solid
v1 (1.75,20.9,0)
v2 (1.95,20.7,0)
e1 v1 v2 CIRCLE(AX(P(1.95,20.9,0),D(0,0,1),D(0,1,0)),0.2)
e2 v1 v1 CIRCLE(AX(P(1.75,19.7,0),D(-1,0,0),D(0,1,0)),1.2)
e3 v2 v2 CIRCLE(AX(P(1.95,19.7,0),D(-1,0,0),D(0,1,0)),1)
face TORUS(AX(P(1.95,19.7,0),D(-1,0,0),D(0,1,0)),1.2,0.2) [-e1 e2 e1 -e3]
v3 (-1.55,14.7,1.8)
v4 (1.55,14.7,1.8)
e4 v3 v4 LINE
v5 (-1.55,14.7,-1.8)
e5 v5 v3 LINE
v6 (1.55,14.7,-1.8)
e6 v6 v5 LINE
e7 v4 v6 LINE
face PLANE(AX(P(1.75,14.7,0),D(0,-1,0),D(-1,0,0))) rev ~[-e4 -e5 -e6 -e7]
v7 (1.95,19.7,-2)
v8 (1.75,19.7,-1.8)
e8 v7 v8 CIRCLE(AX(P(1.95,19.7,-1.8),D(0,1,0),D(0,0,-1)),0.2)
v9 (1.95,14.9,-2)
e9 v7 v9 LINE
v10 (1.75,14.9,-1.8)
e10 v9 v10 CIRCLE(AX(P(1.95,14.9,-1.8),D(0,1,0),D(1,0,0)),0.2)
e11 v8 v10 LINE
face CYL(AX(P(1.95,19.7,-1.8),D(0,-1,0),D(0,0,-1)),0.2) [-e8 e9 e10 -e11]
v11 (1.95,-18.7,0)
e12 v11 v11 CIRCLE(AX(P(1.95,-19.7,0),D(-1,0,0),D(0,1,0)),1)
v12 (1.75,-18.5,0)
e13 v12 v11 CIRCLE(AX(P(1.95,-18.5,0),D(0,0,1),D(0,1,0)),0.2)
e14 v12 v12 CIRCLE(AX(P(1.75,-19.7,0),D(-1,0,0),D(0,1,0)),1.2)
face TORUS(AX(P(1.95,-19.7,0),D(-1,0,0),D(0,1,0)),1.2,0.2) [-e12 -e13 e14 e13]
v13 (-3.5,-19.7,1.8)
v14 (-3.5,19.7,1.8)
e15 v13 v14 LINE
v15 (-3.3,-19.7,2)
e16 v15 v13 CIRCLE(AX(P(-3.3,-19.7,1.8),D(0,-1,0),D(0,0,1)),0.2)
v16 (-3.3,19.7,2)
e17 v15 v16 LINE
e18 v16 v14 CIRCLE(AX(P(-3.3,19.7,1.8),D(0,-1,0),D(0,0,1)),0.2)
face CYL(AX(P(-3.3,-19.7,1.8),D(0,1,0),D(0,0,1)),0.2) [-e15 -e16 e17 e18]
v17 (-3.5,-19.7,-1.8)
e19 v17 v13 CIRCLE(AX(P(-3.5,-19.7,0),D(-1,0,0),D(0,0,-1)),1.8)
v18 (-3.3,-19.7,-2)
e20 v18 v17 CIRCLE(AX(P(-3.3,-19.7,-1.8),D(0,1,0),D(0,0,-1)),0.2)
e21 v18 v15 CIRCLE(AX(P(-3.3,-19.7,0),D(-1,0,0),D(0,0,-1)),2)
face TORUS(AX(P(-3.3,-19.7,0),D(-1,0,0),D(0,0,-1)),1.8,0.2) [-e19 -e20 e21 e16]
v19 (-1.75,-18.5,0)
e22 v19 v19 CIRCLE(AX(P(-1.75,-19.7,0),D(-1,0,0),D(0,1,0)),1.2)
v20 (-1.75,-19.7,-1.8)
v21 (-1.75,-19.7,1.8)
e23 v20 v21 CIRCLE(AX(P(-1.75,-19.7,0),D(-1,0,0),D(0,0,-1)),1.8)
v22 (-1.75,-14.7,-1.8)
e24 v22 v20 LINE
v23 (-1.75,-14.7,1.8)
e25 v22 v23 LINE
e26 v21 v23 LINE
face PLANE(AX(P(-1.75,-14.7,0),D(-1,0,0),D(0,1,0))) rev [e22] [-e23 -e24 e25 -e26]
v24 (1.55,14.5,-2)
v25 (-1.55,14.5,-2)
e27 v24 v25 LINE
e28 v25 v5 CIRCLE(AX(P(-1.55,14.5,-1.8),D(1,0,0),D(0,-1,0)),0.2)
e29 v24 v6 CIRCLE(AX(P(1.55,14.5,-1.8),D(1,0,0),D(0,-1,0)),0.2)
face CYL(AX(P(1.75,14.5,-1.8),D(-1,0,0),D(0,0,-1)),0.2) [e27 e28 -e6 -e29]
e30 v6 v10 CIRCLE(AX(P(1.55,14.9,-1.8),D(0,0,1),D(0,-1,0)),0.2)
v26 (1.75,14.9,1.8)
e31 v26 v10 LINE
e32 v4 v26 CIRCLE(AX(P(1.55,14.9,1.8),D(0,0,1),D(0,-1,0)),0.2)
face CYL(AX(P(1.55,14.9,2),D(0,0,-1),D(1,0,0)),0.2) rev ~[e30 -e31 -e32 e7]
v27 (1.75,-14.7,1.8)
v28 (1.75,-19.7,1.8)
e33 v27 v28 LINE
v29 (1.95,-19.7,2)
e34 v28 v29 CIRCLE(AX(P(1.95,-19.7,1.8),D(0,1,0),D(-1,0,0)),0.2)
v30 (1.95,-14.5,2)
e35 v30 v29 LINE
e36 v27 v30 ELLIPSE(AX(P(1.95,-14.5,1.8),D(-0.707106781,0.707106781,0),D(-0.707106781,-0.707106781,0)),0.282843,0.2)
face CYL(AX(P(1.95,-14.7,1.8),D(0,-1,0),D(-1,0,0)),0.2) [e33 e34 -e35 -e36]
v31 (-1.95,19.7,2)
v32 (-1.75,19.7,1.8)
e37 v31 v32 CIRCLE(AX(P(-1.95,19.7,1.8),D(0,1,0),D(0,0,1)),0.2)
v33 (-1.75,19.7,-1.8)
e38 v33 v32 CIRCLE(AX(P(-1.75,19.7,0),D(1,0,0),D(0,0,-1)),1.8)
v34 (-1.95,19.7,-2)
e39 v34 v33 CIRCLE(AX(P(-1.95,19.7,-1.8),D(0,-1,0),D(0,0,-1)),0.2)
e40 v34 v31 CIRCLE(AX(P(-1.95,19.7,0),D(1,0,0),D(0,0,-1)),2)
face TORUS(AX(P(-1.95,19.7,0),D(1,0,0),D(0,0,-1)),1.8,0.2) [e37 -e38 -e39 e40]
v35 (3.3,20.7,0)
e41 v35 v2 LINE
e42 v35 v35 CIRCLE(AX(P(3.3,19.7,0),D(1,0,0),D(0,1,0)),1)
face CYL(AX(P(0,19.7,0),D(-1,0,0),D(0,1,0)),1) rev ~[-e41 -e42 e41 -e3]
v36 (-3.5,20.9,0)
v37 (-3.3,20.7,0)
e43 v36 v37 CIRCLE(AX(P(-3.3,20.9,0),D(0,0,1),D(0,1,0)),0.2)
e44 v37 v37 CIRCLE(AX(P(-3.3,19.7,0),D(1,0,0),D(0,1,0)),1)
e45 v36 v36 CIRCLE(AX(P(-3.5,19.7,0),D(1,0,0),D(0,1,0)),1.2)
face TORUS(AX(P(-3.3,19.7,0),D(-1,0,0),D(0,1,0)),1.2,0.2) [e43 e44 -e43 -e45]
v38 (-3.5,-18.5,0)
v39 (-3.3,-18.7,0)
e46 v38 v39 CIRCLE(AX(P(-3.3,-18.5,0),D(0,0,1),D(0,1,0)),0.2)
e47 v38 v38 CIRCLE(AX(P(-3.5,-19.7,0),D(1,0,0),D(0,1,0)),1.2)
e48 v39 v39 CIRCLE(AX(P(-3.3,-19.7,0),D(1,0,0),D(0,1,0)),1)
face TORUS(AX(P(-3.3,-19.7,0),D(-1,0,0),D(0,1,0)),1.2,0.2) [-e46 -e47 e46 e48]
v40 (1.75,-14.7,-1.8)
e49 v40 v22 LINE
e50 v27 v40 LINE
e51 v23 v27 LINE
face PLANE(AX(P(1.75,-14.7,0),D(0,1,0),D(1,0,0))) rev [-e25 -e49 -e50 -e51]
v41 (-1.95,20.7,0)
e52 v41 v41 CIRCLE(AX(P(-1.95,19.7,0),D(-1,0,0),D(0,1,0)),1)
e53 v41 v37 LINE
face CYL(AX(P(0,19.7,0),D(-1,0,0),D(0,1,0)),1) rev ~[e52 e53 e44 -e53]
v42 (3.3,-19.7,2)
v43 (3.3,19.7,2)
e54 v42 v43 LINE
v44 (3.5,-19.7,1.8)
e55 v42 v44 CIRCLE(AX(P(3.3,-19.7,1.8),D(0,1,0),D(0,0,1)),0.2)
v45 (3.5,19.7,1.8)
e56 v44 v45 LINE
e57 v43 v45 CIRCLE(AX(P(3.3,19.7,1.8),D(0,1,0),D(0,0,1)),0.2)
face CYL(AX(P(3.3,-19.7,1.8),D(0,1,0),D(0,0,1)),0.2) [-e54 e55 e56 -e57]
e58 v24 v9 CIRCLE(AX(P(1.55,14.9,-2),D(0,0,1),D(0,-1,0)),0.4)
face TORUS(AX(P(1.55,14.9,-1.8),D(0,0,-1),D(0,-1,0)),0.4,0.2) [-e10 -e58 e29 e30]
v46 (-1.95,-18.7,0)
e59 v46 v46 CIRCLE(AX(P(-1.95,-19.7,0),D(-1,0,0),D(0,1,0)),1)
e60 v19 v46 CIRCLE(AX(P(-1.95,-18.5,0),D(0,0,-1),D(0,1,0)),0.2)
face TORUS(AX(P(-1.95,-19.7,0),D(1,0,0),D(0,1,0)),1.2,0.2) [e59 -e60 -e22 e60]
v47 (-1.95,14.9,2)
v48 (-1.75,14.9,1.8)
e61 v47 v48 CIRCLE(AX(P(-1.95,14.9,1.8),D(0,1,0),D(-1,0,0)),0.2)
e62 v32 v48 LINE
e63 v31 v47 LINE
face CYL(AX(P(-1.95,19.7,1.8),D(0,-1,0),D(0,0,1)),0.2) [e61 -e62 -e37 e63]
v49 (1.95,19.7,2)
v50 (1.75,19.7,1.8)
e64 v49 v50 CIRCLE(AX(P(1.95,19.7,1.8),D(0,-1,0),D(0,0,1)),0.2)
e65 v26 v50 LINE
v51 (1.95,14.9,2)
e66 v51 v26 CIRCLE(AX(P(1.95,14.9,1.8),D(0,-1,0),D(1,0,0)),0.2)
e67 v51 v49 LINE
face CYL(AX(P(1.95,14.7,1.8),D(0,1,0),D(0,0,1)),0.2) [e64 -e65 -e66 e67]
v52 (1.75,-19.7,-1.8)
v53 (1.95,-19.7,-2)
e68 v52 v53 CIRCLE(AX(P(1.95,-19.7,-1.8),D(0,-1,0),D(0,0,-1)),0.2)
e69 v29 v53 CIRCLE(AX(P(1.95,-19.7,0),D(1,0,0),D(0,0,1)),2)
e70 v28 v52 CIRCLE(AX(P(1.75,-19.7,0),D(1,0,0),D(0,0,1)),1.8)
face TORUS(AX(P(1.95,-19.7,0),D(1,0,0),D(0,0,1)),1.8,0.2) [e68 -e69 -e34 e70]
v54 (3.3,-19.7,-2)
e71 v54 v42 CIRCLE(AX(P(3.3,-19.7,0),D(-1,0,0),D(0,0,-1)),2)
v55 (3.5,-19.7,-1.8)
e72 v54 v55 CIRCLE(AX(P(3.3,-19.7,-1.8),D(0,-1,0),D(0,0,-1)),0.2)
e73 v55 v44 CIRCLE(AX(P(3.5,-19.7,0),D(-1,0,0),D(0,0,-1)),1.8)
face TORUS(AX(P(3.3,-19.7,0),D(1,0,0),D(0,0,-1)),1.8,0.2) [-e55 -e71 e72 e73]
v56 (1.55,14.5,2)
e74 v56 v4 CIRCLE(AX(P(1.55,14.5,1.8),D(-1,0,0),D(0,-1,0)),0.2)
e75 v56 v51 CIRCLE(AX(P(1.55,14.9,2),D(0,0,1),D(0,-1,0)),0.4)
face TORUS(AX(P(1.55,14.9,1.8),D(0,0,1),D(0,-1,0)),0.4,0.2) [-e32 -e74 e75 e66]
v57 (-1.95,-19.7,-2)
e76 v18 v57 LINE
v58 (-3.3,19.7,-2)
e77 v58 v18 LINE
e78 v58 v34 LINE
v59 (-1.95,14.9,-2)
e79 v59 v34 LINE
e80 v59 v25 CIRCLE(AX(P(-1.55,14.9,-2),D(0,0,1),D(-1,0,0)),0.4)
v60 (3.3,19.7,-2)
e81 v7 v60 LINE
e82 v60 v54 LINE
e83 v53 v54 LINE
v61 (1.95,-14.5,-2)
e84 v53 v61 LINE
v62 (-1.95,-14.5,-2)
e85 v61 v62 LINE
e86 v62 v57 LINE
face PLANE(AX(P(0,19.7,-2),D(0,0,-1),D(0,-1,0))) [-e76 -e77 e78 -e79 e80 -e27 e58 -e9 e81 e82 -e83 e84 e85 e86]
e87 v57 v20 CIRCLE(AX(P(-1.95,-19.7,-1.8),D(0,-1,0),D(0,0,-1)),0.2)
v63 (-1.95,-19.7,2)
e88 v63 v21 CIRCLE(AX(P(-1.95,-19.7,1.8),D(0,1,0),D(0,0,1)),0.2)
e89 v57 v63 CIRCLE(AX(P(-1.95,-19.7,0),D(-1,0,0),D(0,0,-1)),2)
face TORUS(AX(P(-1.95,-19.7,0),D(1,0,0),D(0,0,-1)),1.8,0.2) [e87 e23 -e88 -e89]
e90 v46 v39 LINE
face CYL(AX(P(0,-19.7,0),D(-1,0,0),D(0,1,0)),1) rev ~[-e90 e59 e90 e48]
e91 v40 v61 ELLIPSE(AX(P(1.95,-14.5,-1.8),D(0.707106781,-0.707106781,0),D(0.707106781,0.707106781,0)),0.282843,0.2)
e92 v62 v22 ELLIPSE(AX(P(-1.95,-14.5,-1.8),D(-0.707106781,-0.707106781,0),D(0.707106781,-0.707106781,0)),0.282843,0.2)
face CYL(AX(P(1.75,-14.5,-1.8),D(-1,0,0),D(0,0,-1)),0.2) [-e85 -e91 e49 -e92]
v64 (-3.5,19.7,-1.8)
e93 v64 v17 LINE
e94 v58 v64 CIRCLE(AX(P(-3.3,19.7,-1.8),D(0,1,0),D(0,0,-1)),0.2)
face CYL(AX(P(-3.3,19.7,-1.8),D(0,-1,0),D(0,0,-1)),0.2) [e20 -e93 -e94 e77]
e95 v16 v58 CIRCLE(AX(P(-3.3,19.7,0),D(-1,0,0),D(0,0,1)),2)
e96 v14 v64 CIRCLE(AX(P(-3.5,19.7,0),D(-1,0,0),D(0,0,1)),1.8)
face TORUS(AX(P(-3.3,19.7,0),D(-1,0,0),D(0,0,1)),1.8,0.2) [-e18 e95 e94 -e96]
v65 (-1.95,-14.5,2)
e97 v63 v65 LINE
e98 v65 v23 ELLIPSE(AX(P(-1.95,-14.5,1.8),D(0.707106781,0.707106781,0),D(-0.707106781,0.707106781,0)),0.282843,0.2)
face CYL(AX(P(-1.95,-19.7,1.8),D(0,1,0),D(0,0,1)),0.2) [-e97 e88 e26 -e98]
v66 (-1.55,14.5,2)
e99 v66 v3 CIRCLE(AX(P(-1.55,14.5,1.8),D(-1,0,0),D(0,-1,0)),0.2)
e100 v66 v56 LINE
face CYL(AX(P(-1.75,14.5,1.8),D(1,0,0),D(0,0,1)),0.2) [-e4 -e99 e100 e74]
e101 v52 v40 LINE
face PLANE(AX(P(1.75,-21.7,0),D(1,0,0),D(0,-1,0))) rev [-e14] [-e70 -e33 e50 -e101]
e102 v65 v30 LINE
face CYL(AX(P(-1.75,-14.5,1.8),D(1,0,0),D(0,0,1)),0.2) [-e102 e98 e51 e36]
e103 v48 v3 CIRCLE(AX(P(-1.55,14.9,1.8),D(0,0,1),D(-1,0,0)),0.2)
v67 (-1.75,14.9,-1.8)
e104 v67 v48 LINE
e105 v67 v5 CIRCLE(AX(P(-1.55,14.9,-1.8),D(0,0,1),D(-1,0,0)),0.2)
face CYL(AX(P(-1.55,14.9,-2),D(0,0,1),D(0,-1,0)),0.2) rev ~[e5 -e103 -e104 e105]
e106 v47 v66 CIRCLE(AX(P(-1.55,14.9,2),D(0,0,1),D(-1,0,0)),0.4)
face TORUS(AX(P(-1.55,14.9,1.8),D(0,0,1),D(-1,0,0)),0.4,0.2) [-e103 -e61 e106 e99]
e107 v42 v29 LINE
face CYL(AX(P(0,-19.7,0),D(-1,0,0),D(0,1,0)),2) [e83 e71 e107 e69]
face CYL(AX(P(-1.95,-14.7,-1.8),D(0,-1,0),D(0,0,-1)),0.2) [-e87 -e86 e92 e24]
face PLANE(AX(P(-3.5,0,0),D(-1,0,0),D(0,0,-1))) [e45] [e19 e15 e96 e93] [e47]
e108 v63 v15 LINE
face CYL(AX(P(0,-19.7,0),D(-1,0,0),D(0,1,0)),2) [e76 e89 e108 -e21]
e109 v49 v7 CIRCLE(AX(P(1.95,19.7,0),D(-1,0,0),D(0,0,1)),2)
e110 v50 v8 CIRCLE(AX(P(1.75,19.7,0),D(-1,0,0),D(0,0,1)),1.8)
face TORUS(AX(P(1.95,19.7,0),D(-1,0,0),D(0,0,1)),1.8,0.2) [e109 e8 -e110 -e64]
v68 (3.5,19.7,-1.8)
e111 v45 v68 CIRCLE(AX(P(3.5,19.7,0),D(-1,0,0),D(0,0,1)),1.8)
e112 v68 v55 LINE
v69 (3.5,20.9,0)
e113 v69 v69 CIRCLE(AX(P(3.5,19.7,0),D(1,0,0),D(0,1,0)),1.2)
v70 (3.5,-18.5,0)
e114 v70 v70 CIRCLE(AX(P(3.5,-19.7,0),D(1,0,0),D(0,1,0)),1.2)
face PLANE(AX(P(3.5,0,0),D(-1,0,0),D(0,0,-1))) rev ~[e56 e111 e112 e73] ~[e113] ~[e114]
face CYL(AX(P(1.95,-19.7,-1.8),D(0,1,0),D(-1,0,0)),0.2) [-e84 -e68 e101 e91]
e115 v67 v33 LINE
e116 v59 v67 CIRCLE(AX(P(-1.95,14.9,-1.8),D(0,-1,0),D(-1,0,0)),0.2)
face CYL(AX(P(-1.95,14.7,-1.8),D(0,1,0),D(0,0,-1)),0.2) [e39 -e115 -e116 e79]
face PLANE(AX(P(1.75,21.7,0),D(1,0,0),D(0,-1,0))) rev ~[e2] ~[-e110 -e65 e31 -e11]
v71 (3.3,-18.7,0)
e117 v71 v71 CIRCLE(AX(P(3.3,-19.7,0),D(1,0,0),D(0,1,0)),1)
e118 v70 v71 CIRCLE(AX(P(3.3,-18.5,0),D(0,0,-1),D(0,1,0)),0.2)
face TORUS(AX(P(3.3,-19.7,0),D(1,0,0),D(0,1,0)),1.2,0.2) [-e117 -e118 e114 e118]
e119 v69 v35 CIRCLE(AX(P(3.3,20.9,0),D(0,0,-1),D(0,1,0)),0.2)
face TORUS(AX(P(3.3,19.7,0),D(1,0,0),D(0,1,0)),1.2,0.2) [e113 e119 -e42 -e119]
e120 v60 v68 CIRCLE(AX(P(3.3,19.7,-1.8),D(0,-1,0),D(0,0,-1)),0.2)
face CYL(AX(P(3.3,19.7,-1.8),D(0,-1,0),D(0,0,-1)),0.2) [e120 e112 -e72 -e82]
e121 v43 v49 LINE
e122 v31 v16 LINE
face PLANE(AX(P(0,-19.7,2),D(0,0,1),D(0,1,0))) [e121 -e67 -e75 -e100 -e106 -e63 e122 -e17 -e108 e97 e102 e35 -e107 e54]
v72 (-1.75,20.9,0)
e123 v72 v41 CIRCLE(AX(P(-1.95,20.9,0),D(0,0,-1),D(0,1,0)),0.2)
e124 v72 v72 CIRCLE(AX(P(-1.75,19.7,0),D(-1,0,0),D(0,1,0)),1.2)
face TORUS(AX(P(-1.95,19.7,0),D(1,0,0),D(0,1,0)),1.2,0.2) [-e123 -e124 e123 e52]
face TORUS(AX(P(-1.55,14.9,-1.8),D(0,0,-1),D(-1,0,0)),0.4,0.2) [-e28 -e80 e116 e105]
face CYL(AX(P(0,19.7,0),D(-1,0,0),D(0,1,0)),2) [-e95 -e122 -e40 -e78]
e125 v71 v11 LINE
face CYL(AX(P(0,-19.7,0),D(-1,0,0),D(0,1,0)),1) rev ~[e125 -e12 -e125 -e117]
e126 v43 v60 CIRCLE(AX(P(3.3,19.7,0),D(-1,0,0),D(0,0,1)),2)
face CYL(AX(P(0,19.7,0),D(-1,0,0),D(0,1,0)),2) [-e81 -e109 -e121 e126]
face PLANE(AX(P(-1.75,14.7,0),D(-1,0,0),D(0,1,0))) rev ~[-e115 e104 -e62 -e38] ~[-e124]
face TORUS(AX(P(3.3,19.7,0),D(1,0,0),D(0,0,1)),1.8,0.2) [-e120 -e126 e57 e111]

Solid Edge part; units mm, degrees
sketch "Sketch1" plane through (0, 0, 0) normal (1, 0, 0) x (0, 1, 0)
  arc A0 (-19.7, -2) -> (-19.7, 2) centre (-19.7, 0) cw
  line L0 (-19.7, 2) -> (19.7, 2)
  arc A1 (19.7, 2) -> (19.7, -2) centre (19.7, 0) cw
  line L1 (19.7, -2) -> (-19.7, -2)
  circle A2 centre (-19.7, 0) radius 1
  circle A3 centre (19.7, 0) radius 1
  dimension "D1" = 4
  dimension "D2" = 39.4
  dimension "D3" = 2
  dimension "D4" = 2
extrude "Protrusion1" add sketch "Sketch1" along normal mid plane 7
sketch "Sketch2" plane through (0, 0, 0) normal (0, 0, 1) x (1, 0, 0)
  line L0 (-1.75, 21.7) -> (1.75, 21.7)
  line L1 (1.75, 21.7) -> (1.75, 14.7)
  line L2 (1.75, 14.7) -> (-1.75, 14.7)
  line L3 (-1.75, 14.7) -> (-1.75, 21.7)
  dimension "D1" = 3.5
  dimension "D2" = 7
extrude "Extrusionsausschnitt_1" cut sketch "Sketch2" along normal mid plane 52.3656
mirror "Mirror1" about plane through (0, 0, 0) normal (0, -1, 0) of "Extrusionsausschnitt_1"
fillet "Round_3" radius 0.2 32 edges at (-1.75, 17.2, 2) (-1.75, 21.7, 0) (-1.75, 17.2, -2) (0, 14.7, 2) (0, 14.7, -2) (-1.75, 14.7, 0) (-1.75, 20.7, 0) (3.5, 0, 2) (3.5, 21.7, 0) (3.5, 0, -2) (3.5, -21.7, 0) (1.75, 17.2, 2) (1.75, 17.2, -2) (3.5, 18.7, 0) (1.75, 18.7, 0) (1.75, 14.7, 0) (-3.5, 0, 2) (-3.5, 21.7, 0) (-3.5, 0, -2) (-3.5, -21.7, 0) (-3.5, 18.7, 0) (-1.75, -17.2, 2) (-1.75, -21.7, 0) (-1.75, -17.2, -2) (1.75, -17.2, 2) (1.75, -17.2, -2) (-1.75, -18.7, 0) (3.5, -20.7, 0) (0, -14.7, 2) (1.75, -20.7, 0) (0, -14.7, -2) (-3.5, -20.7, 0)
properties material "Acryl, hoher Anschlag"
